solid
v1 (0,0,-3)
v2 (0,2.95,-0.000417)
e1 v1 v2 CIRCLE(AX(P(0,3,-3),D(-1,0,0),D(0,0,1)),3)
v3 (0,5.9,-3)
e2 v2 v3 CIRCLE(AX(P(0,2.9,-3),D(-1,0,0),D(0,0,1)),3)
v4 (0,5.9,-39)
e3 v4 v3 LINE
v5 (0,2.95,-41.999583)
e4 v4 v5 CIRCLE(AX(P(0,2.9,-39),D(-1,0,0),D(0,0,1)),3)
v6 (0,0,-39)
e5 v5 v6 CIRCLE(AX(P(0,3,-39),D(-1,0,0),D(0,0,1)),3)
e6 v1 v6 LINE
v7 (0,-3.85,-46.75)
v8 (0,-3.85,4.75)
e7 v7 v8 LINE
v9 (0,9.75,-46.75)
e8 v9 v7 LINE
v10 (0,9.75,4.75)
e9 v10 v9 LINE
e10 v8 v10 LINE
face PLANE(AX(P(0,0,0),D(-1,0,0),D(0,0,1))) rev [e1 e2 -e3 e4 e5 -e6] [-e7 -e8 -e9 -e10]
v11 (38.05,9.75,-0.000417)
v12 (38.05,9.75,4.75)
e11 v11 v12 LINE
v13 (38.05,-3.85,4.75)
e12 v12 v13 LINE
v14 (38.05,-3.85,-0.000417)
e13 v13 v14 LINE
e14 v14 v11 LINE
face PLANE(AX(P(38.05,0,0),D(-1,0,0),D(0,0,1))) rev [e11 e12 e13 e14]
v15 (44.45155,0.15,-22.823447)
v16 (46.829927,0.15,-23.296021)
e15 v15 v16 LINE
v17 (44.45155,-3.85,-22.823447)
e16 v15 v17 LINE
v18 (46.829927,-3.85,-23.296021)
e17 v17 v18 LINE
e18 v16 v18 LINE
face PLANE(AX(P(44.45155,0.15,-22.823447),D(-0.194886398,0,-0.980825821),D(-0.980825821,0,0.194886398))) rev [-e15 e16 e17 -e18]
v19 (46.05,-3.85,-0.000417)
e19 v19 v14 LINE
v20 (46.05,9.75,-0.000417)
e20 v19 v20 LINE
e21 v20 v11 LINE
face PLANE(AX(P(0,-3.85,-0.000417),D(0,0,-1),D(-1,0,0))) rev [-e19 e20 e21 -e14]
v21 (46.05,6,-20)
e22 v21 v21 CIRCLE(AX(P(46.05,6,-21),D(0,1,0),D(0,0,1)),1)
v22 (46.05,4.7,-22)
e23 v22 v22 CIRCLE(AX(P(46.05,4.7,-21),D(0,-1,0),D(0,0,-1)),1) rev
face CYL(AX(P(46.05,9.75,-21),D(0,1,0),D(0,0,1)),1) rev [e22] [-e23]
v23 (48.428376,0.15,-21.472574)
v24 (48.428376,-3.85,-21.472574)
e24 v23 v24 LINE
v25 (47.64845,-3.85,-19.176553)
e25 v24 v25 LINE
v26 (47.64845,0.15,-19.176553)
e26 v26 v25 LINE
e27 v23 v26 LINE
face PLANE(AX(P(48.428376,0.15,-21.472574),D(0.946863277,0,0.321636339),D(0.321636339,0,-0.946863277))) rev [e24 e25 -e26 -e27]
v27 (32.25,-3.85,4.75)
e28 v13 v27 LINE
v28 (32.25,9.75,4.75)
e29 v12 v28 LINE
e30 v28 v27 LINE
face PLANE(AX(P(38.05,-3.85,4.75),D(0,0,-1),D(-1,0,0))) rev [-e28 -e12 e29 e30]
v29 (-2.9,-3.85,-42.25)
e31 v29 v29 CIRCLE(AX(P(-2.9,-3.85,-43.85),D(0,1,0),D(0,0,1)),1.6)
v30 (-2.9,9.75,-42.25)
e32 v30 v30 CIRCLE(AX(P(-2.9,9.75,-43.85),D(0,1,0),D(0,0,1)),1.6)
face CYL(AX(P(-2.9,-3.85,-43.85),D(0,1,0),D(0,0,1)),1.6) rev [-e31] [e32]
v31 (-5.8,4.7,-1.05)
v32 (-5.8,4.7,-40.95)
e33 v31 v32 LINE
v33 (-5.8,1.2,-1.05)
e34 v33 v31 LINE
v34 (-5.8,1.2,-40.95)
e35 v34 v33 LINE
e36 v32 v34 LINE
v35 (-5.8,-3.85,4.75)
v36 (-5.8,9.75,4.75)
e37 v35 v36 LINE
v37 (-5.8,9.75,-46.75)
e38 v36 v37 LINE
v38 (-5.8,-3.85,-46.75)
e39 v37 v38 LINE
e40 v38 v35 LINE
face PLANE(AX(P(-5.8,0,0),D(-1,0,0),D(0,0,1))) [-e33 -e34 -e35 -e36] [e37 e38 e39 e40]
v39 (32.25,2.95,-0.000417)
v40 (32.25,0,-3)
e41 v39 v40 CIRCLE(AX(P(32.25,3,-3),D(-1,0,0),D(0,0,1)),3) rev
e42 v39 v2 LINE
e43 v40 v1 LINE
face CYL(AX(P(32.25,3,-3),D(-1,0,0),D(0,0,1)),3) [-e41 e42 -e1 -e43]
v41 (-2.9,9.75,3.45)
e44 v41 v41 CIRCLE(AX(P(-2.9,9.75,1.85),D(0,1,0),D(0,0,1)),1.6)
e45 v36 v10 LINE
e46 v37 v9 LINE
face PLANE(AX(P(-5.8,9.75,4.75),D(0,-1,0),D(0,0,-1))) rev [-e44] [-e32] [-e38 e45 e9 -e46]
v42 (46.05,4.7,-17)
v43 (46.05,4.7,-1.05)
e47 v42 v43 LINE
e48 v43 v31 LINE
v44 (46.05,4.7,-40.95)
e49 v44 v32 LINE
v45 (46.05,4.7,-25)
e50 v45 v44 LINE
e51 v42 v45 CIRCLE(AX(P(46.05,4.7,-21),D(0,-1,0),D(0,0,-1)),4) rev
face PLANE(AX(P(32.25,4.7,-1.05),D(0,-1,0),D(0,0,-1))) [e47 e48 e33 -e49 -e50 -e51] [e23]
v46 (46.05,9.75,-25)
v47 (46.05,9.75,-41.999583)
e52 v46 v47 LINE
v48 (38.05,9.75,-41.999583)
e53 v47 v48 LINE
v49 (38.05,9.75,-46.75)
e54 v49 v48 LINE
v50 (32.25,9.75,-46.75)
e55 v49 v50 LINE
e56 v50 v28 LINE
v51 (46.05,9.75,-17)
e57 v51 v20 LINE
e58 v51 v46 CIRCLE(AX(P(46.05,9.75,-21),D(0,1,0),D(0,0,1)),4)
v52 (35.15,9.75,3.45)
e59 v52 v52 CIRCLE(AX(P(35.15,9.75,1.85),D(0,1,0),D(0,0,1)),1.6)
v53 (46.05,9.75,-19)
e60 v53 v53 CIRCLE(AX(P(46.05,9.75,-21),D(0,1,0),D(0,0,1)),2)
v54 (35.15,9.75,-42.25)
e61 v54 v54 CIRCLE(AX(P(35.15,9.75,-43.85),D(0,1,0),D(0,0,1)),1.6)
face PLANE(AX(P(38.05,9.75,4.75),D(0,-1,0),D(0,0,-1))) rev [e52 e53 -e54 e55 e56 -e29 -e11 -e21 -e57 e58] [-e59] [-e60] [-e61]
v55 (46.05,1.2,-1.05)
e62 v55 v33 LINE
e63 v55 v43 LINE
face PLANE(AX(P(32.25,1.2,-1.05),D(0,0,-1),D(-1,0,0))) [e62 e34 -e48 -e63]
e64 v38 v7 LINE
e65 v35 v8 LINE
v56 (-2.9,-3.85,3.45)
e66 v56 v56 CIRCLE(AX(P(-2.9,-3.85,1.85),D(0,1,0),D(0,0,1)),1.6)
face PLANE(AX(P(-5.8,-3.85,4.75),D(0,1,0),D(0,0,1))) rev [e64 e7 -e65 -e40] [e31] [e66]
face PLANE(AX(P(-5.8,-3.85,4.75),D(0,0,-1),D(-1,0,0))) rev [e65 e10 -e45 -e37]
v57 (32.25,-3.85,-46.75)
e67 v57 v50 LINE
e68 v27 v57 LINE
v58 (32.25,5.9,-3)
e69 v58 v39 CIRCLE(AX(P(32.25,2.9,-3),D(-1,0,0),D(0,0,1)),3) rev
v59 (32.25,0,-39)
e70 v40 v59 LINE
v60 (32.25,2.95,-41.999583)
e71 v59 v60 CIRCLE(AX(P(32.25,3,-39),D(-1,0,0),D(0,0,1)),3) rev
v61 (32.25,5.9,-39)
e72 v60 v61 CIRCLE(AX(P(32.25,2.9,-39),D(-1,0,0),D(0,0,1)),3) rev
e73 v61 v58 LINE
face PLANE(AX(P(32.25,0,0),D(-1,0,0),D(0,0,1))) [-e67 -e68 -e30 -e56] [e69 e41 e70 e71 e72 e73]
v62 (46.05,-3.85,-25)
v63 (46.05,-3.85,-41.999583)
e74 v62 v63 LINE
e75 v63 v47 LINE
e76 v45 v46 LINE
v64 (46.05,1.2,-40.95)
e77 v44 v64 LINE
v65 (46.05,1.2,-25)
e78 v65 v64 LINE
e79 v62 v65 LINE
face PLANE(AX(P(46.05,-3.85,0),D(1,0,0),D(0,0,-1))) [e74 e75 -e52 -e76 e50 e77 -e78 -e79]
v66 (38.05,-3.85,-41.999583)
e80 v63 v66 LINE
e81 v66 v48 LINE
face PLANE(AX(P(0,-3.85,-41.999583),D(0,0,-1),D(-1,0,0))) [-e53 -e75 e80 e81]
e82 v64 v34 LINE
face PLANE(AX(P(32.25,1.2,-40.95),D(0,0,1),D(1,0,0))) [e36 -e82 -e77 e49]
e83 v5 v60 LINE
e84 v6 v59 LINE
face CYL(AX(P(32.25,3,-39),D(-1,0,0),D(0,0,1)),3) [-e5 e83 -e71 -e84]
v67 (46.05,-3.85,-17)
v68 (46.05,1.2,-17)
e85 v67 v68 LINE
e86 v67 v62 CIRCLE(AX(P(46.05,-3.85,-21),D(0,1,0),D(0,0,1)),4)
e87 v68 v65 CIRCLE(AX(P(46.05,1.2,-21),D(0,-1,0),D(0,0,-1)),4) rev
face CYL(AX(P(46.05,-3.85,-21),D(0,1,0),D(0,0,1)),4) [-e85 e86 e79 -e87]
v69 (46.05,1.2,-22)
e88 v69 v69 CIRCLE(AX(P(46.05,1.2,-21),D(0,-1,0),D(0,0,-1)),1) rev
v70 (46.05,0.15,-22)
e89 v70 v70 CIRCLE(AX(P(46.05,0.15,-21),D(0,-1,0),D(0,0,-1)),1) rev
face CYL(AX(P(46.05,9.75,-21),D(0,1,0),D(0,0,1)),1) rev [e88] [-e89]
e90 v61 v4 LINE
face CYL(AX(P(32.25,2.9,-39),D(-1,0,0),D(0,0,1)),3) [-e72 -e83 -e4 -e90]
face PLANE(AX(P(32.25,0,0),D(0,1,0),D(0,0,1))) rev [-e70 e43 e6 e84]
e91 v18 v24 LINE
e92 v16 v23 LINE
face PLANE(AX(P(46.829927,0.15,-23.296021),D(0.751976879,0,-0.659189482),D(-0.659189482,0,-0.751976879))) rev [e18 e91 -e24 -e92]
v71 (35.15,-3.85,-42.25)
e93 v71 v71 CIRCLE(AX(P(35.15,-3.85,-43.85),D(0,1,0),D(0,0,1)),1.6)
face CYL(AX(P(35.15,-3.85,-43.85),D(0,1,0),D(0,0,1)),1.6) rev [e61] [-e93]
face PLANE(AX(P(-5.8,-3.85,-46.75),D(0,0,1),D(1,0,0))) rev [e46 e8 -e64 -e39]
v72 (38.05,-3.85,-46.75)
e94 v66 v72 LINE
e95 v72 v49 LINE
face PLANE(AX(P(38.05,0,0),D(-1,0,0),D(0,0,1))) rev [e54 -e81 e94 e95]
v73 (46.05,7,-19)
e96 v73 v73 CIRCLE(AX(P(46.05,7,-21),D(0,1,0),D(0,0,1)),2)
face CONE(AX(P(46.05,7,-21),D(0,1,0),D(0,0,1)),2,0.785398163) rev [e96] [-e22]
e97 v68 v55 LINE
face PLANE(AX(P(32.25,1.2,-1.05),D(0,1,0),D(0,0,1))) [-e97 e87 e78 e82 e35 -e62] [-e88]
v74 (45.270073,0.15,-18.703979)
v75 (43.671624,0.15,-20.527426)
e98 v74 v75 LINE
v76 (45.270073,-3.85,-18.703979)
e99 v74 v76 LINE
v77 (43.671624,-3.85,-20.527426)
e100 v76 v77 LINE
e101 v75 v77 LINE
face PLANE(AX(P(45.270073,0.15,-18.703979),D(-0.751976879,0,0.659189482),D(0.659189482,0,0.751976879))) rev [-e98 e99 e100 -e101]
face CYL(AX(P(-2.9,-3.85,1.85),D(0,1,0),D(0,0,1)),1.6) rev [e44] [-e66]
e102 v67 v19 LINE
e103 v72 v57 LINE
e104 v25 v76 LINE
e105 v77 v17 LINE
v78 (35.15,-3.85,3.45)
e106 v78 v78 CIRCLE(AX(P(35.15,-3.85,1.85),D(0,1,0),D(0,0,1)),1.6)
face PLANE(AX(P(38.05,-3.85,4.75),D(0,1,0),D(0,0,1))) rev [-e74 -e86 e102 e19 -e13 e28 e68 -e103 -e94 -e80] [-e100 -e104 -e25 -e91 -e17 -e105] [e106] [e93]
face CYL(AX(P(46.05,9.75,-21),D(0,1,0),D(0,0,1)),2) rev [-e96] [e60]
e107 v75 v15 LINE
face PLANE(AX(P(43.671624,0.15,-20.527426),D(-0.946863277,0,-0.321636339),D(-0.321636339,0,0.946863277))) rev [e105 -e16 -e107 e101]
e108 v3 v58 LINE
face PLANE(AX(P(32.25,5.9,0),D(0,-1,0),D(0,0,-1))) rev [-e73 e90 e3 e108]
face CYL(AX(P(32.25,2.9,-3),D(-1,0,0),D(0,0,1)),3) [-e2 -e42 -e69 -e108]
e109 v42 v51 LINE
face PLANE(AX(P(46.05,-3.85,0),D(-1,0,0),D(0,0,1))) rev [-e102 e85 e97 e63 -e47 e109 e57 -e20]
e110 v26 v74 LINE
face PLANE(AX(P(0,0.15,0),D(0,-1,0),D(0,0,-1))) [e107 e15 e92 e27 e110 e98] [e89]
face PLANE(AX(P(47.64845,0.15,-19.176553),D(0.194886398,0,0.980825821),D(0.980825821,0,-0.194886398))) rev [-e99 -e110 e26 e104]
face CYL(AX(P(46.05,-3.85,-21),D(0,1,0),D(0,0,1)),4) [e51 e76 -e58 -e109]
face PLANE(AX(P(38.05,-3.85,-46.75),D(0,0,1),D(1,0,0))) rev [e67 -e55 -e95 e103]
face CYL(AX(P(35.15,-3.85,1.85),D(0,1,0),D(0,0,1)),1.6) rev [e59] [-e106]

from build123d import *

# Parameters (mm, degrees)
SKETCH1_W           = 42
SKETCH1_H           = 5.9
SKETCH1_W_2         = 39.9
SKETCH1_H_2         = 3.5
BOSS_EXTRUDE1_DEPTH = 32.25
FILLET2_R           = 3
SKETCH2_W           = 51.5
SKETCH2_H           = 13.6
SKETCH2_W_2         = 39.9
SKETCH2_H_2         = 3.5
BOSS_EXTRUDE2_DEPTH = 5.8
SKETCH3_W           = 51.5
SKETCH3_H           = 13.6
SKETCH3_W_2         = 39.9
SKETCH3_H_2         = 3.5
BOSS_EXTRUDE3_DEPTH = 5.8
SKETCH4_R           = 1.6
CUT_EXTRUDE1_DEPTH  = 62.792596644
BOSS_EXTRUDE4_DEPTH = 13.6
CUT_EXTRUDE4_DEPTH  = 4
SKETCH15_W          = 39.9
SKETCH15_H          = 3.5
CUT_EXTRUDE5_DEPTH  = 74.483654645


with BuildPart() as part:
    # Sketch1 → Boss-Extrude1 (new body)
    with BuildSketch(Plane(origin=(0, 0, 0), x_dir=(0, 0, -1), z_dir=(1, 0, 0))):
        with Locations((21, 2.95)):
            Rectangle(SKETCH1_W, SKETCH1_H)
        with Locations((21, 2.95)):
            Rectangle(SKETCH1_W_2, SKETCH1_H_2, mode=Mode.SUBTRACT)
    extrude(amount=BOSS_EXTRUDE1_DEPTH)

    # Fillet2
    # the kernel refuses this fillet: 3 mm, written as the material it takes off along each edge
    with BuildSketch(Plane(origin=(-7.5, 0, -42), x_dir=(0, 0, 1), z_dir=(1, 0, 0)), Plane(origin=(-7.5, 5.9, 0), x_dir=(0, 0, -1), z_dir=(1, 0, 0)), Plane(origin=(-7.5, 5.9, -42), x_dir=(0, -1, 0), z_dir=(1, 0, 0))) as fillet2_piece_1:
        with BuildLine():
            CenterArc((FILLET2_R, -FILLET2_R), FILLET2_R, 90, 90)
            Line((0, -FILLET2_R), (0, 0))
            Line((0, 0), (FILLET2_R, 0))
        make_face()
    extrude(amount=47.25, mode=Mode.SUBTRACT)
    with BuildSketch(Plane(origin=(-7.5, 0, 0), x_dir=(0, 0, -1), z_dir=(1, 0, 0))) as fillet2_piece_2:
        with BuildLine():
            CenterArc((FILLET2_R, FILLET2_R), FILLET2_R, 180, 90)
            Line((0, FILLET2_R), (0, 0))
            Line((0, 0), (FILLET2_R, 0))
        make_face()
    extrude(amount=47.25, mode=Mode.SUBTRACT)

    # Sketch2 → Boss-Extrude2 (add)
    with BuildSketch(Plane(origin=(32.25, 0, 0), x_dir=(0, 0, -1), z_dir=(1, 0, 0))):
        with Locations((21, 2.95)):
            Rectangle(SKETCH2_W, SKETCH2_H)
        with Locations((21, 2.95)):
            Rectangle(SKETCH2_W_2, SKETCH2_H_2, mode=Mode.SUBTRACT)
    extrude(amount=BOSS_EXTRUDE2_DEPTH)

    # Sketch3 → Boss-Extrude3 (add)
    with BuildSketch(Plane.ZY):
        with Locations((-21, 2.95)):
            Rectangle(SKETCH3_W, SKETCH3_H)
        with Locations((-21, 2.95)):
            Rectangle(SKETCH3_W_2, SKETCH3_H_2, mode=Mode.SUBTRACT)
    extrude(amount=BOSS_EXTRUDE3_DEPTH)

    # Sketch4 → Cut-Extrude1 (cut, through all)
    with BuildSketch(Plane(origin=(0, 9.75, 0), x_dir=(1, 0, 0), z_dir=(0, 1, 0))):
        with Locations(Location((-2.9, 43.85, 0), (0, 0, 270))):
            Circle(SKETCH4_R)
        with Locations(Location((35.15, 43.85, 0), (0, 0, 270))):
            Circle(SKETCH4_R)
        with Locations(Location((-2.9, -1.85, 0), (0, 0, 270))):
            Circle(SKETCH4_R)
        with Locations(Location((35.15, -1.85, 0), (0, 0, 270))):
            Circle(SKETCH4_R)
    extrude(amount=-CUT_EXTRUDE1_DEPTH, mode=Mode.SUBTRACT)

    # Sketch8 → Boss-Extrude4 (add)
    with BuildSketch(Plane(origin=(0, 9.75, 0), x_dir=(1, 0, 0), z_dir=(0, 1, 0))):
        with BuildLine():
            ThreePointArc((46.05, 17), (50.05, 21), (46.05, 25))
            Line((46.05, 25), (46.05, 41.999583304))
            Line((46.05, 41.999583304), (38.05, 41.999583304))
            Line((38.05, 41.999583304), (38.05, 0.000416696))
            Line((38.05, 0.000416696), (46.05, 0.000416696))
            Line((46.05, 0.000416696), (46.05, 17))
        make_face()
    extrude(amount=-BOSS_EXTRUDE4_DEPTH)

    # Sketch13 → CSK for M2 Flat Head Machine Screw1 (revolve, cut)
    with BuildSketch(Plane(origin=(46.05, 9.75, -21), x_dir=(0, 0, 1), z_dir=(1, 0, 0))):
        Polygon((0, 0), (0, 13.6), (1, 13.6), (1, 3.75), (2, 2.75), (2, 0), align=None)
    revolve(axis=Axis((46.05, 16.1, -21), (0, -1, 0)), mode=Mode.SUBTRACT)

    # Sketch14 → Cut-Extrude4 (cut)
    with BuildSketch(Plane.XZ.offset(3.85)):
        Polygon((43.671623782, -20.5274256), (44.451550455, -22.823447025), (46.829926673, -23.296021425), (48.428376218, -21.4725744), (47.648449545, -19.176552975), (45.270073327, -18.703978575), align=None)
    extrude(amount=-CUT_EXTRUDE4_DEPTH, mode=Mode.SUBTRACT)

    # Sketch15 → Cut-Extrude5 (cut, through all)
    with BuildSketch(Plane.ZY.offset(5.8)):
        with Locations((-21, 2.95)):
            Rectangle(SKETCH15_W, SKETCH15_H)
    extrude(amount=-CUT_EXTRUDE5_DEPTH, mode=Mode.SUBTRACT)


solid = part.part
